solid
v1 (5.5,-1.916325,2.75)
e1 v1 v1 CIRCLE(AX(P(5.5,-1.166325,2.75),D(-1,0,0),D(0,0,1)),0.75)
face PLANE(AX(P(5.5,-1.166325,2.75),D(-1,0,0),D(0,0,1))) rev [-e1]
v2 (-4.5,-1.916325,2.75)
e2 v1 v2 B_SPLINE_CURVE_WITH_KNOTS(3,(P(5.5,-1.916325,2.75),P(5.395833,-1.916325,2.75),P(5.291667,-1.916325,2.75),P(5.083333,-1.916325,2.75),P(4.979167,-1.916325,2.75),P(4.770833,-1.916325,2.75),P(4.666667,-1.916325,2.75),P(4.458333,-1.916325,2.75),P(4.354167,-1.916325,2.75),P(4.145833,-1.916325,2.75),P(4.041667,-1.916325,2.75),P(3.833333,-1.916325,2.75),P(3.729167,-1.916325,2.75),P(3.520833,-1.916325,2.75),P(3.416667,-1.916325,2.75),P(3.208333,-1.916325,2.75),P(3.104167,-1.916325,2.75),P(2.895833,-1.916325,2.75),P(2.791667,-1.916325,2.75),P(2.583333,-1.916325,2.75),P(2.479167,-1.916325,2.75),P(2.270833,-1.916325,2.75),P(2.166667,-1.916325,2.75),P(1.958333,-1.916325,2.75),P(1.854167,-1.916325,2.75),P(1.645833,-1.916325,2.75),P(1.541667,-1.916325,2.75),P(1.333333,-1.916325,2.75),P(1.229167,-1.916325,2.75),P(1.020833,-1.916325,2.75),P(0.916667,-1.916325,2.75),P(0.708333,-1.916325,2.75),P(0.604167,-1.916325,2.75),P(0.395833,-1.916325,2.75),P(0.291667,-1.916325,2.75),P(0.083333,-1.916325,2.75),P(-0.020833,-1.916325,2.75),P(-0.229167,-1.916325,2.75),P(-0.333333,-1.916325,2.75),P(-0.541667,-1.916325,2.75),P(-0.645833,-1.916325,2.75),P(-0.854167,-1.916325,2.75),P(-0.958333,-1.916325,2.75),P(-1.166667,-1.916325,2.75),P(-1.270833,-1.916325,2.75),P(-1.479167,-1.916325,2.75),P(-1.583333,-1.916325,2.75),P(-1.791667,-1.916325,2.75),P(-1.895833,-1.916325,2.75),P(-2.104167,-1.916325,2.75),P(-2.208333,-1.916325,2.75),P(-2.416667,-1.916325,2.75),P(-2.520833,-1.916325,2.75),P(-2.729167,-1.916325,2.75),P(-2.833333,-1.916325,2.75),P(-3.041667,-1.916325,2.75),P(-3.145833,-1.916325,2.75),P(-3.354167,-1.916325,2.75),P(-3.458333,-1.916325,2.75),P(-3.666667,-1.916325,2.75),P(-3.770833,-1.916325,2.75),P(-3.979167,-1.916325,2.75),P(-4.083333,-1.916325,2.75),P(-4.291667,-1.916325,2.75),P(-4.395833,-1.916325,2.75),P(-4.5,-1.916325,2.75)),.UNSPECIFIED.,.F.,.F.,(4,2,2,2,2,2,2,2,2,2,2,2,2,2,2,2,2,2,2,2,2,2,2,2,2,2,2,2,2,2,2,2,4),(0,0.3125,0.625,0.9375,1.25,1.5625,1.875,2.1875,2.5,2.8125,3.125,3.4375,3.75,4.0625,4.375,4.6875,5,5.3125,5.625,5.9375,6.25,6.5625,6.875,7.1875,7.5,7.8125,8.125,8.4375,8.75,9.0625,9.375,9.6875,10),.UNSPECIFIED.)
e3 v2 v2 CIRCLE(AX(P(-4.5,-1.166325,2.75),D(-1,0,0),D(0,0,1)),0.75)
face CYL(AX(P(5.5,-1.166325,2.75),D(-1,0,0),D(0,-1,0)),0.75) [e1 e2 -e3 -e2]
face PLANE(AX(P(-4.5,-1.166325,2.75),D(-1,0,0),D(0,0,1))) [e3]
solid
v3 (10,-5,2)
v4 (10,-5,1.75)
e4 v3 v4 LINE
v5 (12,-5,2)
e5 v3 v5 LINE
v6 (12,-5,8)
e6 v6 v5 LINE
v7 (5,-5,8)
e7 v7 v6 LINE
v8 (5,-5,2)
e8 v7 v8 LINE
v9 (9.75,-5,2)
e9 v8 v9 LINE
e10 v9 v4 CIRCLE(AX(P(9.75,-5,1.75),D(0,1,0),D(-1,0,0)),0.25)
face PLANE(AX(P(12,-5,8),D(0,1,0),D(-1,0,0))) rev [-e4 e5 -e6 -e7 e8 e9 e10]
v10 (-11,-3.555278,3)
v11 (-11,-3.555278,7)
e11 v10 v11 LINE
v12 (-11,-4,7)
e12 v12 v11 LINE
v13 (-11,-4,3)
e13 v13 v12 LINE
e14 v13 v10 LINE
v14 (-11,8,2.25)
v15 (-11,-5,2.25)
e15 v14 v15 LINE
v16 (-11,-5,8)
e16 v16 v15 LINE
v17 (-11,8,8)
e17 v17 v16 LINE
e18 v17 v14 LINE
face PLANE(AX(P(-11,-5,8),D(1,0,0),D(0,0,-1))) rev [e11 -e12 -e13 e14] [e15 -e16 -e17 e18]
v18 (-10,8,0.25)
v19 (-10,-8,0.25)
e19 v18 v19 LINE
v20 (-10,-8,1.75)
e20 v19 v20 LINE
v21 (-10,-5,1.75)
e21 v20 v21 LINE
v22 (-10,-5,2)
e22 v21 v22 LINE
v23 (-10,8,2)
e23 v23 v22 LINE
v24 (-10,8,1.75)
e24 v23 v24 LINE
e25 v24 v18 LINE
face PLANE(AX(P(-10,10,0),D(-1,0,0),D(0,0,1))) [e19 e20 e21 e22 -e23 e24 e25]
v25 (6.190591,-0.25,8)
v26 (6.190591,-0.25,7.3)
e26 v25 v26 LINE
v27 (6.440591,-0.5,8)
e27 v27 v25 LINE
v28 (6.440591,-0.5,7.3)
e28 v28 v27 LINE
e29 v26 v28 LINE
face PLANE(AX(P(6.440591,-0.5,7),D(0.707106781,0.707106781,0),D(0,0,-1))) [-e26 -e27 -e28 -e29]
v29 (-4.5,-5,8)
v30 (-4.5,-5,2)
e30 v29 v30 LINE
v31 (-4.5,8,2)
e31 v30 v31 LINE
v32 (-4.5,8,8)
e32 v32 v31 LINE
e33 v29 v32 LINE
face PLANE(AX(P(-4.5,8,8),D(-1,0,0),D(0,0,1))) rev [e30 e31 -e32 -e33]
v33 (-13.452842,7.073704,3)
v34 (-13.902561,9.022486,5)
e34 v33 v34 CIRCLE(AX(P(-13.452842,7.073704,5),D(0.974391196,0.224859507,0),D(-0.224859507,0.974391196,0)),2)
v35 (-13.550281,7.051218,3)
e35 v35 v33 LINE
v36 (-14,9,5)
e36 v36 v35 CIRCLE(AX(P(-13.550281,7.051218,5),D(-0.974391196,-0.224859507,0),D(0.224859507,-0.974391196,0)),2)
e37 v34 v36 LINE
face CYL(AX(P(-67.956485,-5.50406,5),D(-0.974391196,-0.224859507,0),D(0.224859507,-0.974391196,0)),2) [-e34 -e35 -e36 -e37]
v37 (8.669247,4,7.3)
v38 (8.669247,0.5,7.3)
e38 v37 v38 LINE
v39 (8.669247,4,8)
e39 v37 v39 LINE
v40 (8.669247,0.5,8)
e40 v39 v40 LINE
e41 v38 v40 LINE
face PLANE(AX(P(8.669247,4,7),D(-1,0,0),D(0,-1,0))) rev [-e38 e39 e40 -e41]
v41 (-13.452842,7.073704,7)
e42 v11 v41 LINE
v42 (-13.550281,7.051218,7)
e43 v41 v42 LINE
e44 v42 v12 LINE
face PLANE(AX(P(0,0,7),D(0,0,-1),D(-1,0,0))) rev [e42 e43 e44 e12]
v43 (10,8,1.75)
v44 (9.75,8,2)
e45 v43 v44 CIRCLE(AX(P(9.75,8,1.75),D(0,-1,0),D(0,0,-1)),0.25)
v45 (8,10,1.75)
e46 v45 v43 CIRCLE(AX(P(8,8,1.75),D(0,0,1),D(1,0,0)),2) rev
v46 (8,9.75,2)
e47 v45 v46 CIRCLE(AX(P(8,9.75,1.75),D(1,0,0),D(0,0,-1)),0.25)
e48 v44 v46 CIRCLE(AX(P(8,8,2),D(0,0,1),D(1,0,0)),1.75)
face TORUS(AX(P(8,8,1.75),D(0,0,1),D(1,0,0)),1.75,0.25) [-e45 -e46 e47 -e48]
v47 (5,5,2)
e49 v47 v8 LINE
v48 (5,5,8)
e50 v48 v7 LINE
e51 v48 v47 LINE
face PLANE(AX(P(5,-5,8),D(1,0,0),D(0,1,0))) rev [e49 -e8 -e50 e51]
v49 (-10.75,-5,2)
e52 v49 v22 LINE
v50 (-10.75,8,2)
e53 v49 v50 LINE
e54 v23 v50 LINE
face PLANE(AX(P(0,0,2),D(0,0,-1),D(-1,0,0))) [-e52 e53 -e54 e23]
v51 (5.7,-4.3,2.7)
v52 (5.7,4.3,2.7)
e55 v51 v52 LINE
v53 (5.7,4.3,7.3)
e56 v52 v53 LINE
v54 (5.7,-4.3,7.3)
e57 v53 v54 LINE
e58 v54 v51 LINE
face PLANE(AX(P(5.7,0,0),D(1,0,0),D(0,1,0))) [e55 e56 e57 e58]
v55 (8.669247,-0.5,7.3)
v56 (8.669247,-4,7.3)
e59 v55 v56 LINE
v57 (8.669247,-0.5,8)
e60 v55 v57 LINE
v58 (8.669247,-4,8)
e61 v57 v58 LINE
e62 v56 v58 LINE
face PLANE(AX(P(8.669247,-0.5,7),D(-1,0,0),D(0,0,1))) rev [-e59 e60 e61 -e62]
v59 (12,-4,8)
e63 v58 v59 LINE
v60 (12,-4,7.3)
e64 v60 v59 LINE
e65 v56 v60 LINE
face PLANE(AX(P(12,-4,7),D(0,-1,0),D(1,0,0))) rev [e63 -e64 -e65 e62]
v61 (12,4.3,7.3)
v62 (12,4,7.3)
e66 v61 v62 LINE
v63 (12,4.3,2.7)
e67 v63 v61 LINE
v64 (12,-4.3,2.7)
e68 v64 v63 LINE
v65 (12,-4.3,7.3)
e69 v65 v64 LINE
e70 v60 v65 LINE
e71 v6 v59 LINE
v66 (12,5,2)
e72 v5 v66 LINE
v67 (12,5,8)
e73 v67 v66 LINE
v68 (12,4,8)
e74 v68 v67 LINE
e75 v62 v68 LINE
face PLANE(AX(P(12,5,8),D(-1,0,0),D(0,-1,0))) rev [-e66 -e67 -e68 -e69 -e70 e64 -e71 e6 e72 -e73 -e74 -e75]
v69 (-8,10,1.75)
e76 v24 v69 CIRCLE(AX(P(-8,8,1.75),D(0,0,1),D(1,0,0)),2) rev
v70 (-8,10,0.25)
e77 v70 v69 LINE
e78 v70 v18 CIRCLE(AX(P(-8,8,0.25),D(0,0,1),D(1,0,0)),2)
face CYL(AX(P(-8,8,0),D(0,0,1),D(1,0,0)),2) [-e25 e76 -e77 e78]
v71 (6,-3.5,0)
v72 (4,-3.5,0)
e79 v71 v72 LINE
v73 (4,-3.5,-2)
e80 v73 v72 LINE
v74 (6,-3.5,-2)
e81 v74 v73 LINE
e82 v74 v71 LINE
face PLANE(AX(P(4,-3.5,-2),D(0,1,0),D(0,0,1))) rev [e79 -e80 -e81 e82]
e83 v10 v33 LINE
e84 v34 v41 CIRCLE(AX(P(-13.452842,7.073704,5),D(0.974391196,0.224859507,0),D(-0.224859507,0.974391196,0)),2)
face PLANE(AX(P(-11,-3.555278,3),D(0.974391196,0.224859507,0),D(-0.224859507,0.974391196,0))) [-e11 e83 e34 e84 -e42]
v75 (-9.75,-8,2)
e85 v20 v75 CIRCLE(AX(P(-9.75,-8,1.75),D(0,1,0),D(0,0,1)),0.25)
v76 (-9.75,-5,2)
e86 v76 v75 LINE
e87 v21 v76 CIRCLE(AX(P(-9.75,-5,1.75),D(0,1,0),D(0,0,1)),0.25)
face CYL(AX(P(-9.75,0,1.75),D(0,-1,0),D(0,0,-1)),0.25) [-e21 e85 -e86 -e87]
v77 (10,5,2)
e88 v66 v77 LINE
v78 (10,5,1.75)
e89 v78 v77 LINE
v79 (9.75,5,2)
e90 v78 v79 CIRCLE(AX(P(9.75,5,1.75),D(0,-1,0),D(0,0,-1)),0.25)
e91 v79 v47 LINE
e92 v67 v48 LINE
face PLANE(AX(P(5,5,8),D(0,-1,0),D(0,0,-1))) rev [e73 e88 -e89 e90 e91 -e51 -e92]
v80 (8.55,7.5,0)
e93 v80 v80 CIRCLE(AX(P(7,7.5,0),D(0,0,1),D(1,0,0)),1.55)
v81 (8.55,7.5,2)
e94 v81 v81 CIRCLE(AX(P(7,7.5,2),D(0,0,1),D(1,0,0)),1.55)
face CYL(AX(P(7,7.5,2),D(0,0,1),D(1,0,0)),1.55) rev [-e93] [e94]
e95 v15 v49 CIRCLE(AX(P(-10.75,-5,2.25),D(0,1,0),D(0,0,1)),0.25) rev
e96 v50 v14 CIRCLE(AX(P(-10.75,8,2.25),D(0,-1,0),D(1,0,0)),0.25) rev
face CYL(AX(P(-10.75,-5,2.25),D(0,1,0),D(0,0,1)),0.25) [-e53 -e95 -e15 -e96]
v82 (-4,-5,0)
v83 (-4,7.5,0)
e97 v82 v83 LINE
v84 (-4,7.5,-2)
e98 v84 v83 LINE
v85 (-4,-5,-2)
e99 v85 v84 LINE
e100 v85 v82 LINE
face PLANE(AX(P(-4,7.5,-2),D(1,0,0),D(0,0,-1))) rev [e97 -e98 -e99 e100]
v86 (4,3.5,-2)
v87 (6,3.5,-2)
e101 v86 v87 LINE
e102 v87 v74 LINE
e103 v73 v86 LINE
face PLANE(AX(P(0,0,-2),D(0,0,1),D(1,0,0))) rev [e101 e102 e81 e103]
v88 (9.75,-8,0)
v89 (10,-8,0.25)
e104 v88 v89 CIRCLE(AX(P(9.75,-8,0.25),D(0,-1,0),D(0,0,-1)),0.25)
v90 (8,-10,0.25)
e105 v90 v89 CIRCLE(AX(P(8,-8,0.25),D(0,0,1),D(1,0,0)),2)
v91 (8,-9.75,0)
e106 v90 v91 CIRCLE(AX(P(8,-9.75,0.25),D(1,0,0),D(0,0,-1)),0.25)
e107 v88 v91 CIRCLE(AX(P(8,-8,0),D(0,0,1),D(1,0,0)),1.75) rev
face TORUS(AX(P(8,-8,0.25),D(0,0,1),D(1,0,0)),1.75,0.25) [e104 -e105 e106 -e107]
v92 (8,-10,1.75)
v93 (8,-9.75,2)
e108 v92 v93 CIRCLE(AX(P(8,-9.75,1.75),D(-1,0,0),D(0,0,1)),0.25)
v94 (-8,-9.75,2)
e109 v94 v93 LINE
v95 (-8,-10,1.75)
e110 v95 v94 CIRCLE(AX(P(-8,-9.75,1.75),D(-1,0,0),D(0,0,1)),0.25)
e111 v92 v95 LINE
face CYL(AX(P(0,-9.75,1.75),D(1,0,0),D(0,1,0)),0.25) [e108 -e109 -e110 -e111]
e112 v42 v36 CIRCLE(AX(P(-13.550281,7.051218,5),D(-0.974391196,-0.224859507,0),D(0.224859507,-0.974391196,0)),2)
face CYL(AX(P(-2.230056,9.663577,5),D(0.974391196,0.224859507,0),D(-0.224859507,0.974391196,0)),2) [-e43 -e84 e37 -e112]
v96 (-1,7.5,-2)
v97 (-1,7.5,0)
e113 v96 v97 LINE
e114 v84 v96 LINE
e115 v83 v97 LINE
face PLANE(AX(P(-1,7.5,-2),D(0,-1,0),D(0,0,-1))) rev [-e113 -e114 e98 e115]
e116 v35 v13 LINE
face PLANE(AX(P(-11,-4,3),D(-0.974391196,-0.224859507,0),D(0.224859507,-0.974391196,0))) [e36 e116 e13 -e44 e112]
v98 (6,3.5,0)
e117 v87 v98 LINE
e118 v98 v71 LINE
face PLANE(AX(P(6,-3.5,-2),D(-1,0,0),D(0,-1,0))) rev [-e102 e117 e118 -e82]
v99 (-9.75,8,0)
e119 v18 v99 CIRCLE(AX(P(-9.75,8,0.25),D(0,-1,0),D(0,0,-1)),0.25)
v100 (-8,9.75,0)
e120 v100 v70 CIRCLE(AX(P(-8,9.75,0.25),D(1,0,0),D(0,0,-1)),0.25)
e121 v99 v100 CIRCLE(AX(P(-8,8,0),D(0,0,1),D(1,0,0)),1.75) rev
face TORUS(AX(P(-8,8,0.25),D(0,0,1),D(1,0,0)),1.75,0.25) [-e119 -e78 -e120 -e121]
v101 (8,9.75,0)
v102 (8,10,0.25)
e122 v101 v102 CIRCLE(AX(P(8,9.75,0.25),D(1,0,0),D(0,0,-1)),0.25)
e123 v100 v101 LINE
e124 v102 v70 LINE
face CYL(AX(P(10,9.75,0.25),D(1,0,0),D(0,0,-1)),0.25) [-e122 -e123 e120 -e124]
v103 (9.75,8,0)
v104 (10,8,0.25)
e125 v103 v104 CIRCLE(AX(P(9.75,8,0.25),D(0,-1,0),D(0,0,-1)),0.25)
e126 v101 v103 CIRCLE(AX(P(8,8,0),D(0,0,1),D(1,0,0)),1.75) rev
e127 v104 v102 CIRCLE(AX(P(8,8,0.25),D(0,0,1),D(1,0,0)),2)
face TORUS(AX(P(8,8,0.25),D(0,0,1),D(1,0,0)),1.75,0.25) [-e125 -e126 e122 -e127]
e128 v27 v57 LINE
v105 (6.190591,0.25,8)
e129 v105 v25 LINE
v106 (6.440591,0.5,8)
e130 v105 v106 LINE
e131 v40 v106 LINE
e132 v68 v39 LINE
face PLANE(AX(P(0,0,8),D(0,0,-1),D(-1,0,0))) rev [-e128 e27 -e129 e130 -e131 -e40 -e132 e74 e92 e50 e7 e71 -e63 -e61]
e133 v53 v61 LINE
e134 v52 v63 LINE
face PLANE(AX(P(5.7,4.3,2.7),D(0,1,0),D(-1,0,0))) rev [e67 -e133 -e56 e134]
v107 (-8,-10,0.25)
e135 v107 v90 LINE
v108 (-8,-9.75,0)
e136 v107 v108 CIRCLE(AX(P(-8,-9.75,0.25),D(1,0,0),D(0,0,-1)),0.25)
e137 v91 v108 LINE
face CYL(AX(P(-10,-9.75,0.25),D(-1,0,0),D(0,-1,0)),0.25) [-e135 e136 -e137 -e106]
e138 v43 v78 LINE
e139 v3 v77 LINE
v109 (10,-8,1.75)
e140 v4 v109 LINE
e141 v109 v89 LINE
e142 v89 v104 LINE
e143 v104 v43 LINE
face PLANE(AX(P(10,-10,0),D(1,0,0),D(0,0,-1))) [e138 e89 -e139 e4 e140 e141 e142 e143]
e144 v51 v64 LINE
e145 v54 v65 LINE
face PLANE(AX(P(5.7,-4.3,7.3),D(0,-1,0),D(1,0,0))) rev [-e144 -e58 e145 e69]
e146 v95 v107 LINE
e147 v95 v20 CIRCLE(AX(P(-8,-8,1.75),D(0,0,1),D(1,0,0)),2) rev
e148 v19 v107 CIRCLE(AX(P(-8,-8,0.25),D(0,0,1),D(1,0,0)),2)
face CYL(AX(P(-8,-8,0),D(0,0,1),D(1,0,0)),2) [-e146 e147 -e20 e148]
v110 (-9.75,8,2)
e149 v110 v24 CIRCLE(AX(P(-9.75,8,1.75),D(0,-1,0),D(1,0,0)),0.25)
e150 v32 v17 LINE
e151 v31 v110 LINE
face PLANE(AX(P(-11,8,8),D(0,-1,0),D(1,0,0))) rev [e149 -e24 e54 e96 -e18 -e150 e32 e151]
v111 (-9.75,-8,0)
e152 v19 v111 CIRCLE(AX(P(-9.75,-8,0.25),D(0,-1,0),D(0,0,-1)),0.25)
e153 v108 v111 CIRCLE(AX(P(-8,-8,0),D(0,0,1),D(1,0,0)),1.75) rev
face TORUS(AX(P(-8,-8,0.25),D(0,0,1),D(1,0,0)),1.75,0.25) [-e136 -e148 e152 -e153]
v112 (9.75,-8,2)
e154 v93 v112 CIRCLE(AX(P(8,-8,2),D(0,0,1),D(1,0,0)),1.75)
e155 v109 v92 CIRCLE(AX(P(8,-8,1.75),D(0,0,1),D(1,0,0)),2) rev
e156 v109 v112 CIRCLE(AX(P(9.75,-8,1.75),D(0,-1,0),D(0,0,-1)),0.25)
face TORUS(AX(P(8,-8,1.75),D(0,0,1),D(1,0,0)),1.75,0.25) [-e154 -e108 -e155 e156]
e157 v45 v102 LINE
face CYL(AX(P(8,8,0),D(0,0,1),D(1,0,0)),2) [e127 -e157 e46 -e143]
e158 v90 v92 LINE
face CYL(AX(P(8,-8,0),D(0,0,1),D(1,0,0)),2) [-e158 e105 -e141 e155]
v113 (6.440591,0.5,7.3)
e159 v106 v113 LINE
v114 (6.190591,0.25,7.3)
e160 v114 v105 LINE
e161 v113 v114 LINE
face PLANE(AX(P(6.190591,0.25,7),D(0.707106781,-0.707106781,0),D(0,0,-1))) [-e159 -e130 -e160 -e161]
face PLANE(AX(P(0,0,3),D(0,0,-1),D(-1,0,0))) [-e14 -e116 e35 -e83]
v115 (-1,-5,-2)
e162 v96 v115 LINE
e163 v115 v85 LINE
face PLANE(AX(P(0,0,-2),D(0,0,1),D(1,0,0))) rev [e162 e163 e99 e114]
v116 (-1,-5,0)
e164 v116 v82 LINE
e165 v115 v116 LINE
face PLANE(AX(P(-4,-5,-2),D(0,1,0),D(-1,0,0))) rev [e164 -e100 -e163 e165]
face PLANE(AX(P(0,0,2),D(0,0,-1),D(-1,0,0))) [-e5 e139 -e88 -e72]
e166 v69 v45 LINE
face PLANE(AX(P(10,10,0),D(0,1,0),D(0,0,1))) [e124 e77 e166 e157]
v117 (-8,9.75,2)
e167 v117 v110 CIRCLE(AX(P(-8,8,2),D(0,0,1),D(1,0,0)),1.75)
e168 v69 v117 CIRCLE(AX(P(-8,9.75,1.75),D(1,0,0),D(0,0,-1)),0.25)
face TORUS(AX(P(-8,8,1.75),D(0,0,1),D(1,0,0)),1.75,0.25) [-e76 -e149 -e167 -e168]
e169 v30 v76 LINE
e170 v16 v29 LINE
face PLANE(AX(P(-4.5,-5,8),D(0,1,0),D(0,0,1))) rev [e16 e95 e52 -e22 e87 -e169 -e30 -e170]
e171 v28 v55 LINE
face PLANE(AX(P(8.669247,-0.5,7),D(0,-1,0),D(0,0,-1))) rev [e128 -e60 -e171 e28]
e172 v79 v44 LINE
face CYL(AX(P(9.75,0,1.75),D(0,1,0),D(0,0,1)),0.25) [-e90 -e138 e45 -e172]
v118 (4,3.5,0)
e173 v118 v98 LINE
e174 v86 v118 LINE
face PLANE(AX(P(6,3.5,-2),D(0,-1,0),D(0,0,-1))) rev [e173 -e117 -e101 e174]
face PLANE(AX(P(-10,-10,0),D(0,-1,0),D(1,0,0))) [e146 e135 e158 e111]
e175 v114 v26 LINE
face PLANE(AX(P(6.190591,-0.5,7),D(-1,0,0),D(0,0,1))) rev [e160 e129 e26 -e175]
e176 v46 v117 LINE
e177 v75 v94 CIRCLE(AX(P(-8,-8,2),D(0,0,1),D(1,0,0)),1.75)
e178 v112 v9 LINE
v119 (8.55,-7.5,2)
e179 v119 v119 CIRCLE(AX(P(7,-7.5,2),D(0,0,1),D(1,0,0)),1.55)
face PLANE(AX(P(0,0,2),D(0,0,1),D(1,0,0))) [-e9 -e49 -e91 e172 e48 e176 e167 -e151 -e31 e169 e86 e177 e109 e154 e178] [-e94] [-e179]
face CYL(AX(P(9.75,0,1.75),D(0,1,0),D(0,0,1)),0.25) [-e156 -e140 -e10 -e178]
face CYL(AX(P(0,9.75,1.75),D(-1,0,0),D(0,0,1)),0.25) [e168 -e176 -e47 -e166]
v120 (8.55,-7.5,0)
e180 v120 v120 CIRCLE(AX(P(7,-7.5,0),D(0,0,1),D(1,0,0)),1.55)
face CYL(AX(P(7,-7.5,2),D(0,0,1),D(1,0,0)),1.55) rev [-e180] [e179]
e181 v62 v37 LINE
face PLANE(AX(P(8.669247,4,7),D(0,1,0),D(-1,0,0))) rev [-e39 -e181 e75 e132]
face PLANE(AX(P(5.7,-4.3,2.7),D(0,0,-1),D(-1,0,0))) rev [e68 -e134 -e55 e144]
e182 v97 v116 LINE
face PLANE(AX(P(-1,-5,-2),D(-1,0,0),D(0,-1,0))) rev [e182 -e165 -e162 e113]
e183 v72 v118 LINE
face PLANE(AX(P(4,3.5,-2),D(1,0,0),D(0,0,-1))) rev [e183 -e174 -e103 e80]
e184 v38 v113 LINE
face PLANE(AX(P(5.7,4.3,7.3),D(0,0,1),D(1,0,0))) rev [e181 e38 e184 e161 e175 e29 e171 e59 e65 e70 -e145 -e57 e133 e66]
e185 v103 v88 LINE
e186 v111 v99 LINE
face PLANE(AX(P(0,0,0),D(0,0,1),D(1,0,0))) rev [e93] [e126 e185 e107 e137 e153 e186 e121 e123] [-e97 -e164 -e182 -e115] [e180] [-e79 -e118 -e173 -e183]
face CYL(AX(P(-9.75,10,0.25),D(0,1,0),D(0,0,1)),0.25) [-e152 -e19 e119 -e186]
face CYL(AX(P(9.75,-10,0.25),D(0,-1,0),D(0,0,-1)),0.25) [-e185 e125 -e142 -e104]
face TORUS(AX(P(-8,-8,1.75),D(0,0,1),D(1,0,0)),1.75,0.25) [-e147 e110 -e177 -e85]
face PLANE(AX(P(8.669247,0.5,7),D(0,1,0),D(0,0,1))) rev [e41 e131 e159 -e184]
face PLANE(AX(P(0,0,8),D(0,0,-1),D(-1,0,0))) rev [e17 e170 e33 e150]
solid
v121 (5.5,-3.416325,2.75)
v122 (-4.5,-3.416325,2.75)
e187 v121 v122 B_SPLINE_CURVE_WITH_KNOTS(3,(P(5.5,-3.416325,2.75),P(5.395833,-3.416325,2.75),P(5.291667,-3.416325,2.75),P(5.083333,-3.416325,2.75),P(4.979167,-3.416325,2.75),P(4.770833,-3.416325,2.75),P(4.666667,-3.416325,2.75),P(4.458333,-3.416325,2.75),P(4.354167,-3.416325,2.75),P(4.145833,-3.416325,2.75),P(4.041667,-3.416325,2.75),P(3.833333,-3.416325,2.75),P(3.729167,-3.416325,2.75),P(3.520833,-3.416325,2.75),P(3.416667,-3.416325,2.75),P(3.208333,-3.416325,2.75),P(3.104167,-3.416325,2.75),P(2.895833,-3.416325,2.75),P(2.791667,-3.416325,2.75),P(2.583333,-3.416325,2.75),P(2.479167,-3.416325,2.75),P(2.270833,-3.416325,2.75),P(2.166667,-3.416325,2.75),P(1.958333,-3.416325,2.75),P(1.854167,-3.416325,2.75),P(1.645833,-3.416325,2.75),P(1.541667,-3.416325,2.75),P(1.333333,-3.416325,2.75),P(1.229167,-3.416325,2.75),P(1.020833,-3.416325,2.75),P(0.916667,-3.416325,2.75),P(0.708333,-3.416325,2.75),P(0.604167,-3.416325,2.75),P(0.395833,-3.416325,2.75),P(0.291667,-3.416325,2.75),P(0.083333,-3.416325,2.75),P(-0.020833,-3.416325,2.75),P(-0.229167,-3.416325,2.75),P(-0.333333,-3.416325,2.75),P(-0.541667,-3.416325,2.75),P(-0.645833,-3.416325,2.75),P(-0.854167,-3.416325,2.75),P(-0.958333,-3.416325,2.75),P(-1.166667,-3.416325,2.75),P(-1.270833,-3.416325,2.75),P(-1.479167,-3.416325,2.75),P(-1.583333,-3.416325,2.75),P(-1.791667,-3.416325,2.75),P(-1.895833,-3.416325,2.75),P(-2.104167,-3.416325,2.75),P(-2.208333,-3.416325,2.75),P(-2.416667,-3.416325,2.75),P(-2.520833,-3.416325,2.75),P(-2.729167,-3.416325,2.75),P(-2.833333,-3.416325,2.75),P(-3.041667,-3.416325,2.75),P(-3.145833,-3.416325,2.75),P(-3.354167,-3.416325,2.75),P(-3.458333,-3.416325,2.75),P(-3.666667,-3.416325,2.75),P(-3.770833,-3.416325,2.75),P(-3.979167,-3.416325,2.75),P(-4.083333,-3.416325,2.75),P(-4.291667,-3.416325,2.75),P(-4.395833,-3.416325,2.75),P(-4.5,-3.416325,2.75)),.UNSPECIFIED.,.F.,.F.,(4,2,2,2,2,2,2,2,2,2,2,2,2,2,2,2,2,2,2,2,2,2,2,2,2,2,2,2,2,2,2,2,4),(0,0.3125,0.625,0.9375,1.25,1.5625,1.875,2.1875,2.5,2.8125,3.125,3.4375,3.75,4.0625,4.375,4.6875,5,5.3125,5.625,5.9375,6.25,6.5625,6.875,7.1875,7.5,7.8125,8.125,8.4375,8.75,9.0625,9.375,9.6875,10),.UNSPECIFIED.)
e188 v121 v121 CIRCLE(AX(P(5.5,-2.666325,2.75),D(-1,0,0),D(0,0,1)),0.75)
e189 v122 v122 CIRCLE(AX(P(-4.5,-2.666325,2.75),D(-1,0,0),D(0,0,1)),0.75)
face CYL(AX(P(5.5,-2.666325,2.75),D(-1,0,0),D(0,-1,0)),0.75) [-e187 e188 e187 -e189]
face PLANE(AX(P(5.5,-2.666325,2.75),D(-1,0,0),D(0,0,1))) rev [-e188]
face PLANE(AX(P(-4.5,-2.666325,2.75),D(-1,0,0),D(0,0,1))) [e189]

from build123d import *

# Parameters (mm, degrees)
CROQUIS1_W                          = 20
CROQUIS1_H                          = 20
SALIENTE_EXTRUIR1_DEPTH             = 2
CROQUIS2_W                          = 7
CROQUIS2_H                          = 10
SALIENTE_EXTRUIR2_DEPTH             = 6
CROQUIS3_W                          = 6.5
CROQUIS3_H                          = 13
SALIENTE_EXTRUIR3_DEPTH             = 6
SALIENTE_EXTRUIR4_DEPTH             = 4
CROQUIS6_W                          = 3
CROQUIS6_H                          = 12.5
SALIENTE_EXTRUIR6_DEPTH             = 2
CROQUIS7_W                          = 2
CROQUIS7_H                          = 7
SALIENTE_EXTRUIR7_DEPTH             = 2
CROQUIS8_W                          = 4.6
CROQUIS8_H                          = 8.6
CORTAR_EXTRUIR1_DEPTH               = 6.3
NGULO_DE_SALIDA1_ANGLE              = -77.005383208
NGULO_DE_SALIDA2_ANGLE              = 77.005383208
DI_METRO_DE_TALADRO_3_1_3_1_1_D     = 3.1
DI_METRO_DE_TALADRO_3_1_3_1_1_DEPTH = 4
REDONDEO2_R                         = 2
REDONDEO3_R                         = 2
REDONDEO4_R                         = 0.25
CORTAR_EXTRUIR2_DEPTH               = 1
CHAFL_N1_SIZE                       = 0.25
CROQUIS19_R                         = 0.75
SALIENTE_EXTRUIR9_DEPTH             = 10
SALIENTE_EXTRUIR9_2_DEPTH           = 10


# Some blends are built 0.0001 mm under size
with BuildPart() as part:
    # Croquis1 → Saliente-Extruir1 (new body)
    with BuildSketch(Plane.XY.offset(2)):
        Rectangle(CROQUIS1_W, CROQUIS1_H)
    extrude(amount=-SALIENTE_EXTRUIR1_DEPTH)

    # Croquis2 → Saliente-Extruir2 (add)
    with BuildSketch(Plane.XY.offset(2)):
        with Locations((8.5, 0)):
            Rectangle(CROQUIS2_W, CROQUIS2_H)
    extrude(amount=SALIENTE_EXTRUIR2_DEPTH)

    # Croquis3 → Saliente-Extruir3 (add)
    with BuildSketch(Plane.XY.offset(2)):
        with Locations((-7.75, 1.5)):
            Rectangle(CROQUIS3_W, CROQUIS3_H)
    extrude(amount=SALIENTE_EXTRUIR3_DEPTH)

    # Croquis4 → Saliente-Extruir4 (add)
    with BuildSketch(Plane.XY.offset(7)):
        Polygon((-68.40620408, -3.555277865), (-70.333333333, -4), (-11, -4), (-11, -3.555277865), align=None)
    extrude(amount=-SALIENTE_EXTRUIR4_DEPTH)

    # Croquis6 → Saliente-Extruir6 (add)
    with BuildSketch(Plane(origin=(0, 0, 0), x_dir=(-1, 0, 0), z_dir=(0, 0, -1))):
        with Locations((2.5, 1.25)):
            Rectangle(CROQUIS6_W, CROQUIS6_H)
    extrude(amount=SALIENTE_EXTRUIR6_DEPTH)

    # Croquis7 → Saliente-Extruir7 (add)
    with BuildSketch(Plane(origin=(0, 0, 0), x_dir=(-1, 0, 0), z_dir=(0, 0, -1))):
        with Locations((-5, 0)):
            Rectangle(CROQUIS7_W, CROQUIS7_H)
    extrude(amount=SALIENTE_EXTRUIR7_DEPTH)

    # Croquis8 → Cortar-Extruir1 (cut)
    with BuildSketch(Plane(origin=(12, 0, 0), x_dir=(0, 0, -1), z_dir=(1, 0, 0))):
        with Locations((-5, 0)):
            Rectangle(CROQUIS8_W, CROQUIS8_H)
    extrude(amount=-CORTAR_EXTRUIR1_DEPTH, mode=Mode.SUBTRACT)

    # Ángulo de salida1
    ngulo_de_salida1_faces = [part.faces().sort_by_distance(p)[0] for p in [
        (-39.70310204, -3.555277865, 5),
    ]]
    draft(ngulo_de_salida1_faces, Plane(origin=(-11, -5, 8), x_dir=(0, 0, -1), z_dir=(-1, 0, 0)), NGULO_DE_SALIDA1_ANGLE)

    # Ángulo de salida2
    ngulo_de_salida2_faces = [part.faces().sort_by_distance(p)[0] for p in [
        (-40.666666667, -4, 5),
    ]]
    draft(ngulo_de_salida2_faces, Plane(origin=(-11, -5, 8), x_dir=(0, 0, -1), z_dir=(-1, 0, 0)), NGULO_DE_SALIDA2_ANGLE)

    # Diámetro de taladro Ø3.1 (3.1)1
    with Locations(Plane.XY.offset(2)):
        with Locations((7, -7.5), (7, 7.5)):
            Hole(DI_METRO_DE_TALADRO_3_1_3_1_1_D / 2, depth=DI_METRO_DE_TALADRO_3_1_3_1_1_DEPTH)

    # Redondeo2
    redondeo2_edges = [part.edges().sort_by_distance(p)[0] for p in [
        (10, 10, 1),
        (10, -10, 1),
        (-10, -10, 1),
        (-10, 10, 1),
    ]]
    fillet(redondeo2_edges, radius=REDONDEO2_R)

    # Redondeo3
    redondeo3_edges = [part.edges().sort_by_distance(p)[0] for p in [
        (-13.95128044, 9.011242975, 7),
        (-13.95128044, 9.011242975, 3),
    ]]
    fillet(redondeo3_edges, radius=REDONDEO3_R - 0.0001)  # a hair under: the kernel refuses the full size

    # Redondeo4
    # the kernel refuses this fillet: 0.25 mm, written as the material it takes off along each edge
    with BuildSketch(Plane(origin=(8, 10, 2), x_dir=(0, -1, 0), z_dir=(-1, 0, 0)), Plane(origin=(8, 10, 0), x_dir=(0, 0, 1), z_dir=(-1, 0, 0)), Plane(origin=(-8, -10, 2), x_dir=(0, 1, 0), z_dir=(1, 0, 0)), Plane(origin=(-10, 8, 0), x_dir=(0, 0, 1), z_dir=(0, -1, 0)), Plane(origin=(10, -8, 0), x_dir=(0, 0, 1), z_dir=(0, 1, 0)), Plane(origin=(-8, -10, 0), x_dir=(0, 0, 1), z_dir=(1, 0, 0))) as redondeo4_piece_1:
        with BuildLine():
            CenterArc((REDONDEO4_R, -REDONDEO4_R), REDONDEO4_R, 90, 90)
            Line((0, -REDONDEO4_R), (0, 0))
            Line((0, 0), (REDONDEO4_R, 0))
        make_face()
    extrude(amount=16, mode=Mode.SUBTRACT)
    with BuildSketch(Plane(origin=(10, -8, 2), x_dir=(-1, 0, 0), z_dir=(0, 1, 0)), Plane(origin=(10, 5, 2), x_dir=(-1, 0, 0), z_dir=(0, 1, 0)), Plane(origin=(-10, -5, 2), x_dir=(1, 0, 0), z_dir=(0, -1, 0))) as redondeo4_piece_2:
        with BuildLine():
            CenterArc((REDONDEO4_R, -REDONDEO4_R), REDONDEO4_R, 90, 90)
            Line((0, -REDONDEO4_R), (0, 0))
            Line((0, 0), (REDONDEO4_R, 0))
        make_face()
    extrude(amount=3, mode=Mode.SUBTRACT)
    with BuildSketch(Plane(origin=(-8, -8, 2), x_dir=(-1, 0, 0), z_dir=(0, 1, 0))) as redondeo4_piece_3:
        with BuildLine():
            CenterArc((2 - REDONDEO4_R, -REDONDEO4_R), REDONDEO4_R, 0, 90)
            Line((2, -REDONDEO4_R), (2, 0))
            Line((2, 0), (2 - REDONDEO4_R, 0))
        make_face()
    revolve(axis=Axis((-8, -8, 2), (0, 0, 1)), revolution_arc=90, mode=Mode.SUBTRACT)
    with BuildSketch(Plane(origin=(8, -8, 2), x_dir=(0, -1, 0), z_dir=(-1, 0, 0))) as redondeo4_piece_4:
        with BuildLine():
            CenterArc((2 - REDONDEO4_R, -REDONDEO4_R), REDONDEO4_R, 0, 90)
            Line((2, -REDONDEO4_R), (2, 0))
            Line((2, 0), (2 - REDONDEO4_R, 0))
        make_face()
    revolve(axis=Axis((8, -8, 2), (0, 0, 1)), revolution_arc=90, mode=Mode.SUBTRACT)
    with BuildSketch(Plane(origin=(8, 8, 2), x_dir=(0, 1, 0), z_dir=(-1, 0, 0))) as redondeo4_piece_5:
        with BuildLine():
            CenterArc((2 - REDONDEO4_R, REDONDEO4_R), REDONDEO4_R, 270, 90)
            Line((2, REDONDEO4_R), (2, 0))
            Line((2, 0), (2 - REDONDEO4_R, 0))
        make_face()
    revolve(axis=Axis((8, 8, 2), (0, 0, -1)), revolution_arc=90, mode=Mode.SUBTRACT)
    with BuildSketch(Plane(origin=(-8, 8, 2), x_dir=(-1, 0, 0), z_dir=(0, -1, 0))) as redondeo4_piece_6:
        with BuildLine():
            CenterArc((2 - REDONDEO4_R, REDONDEO4_R), REDONDEO4_R, 270, 90)
            Line((2, REDONDEO4_R), (2, 0))
            Line((2, 0), (2 - REDONDEO4_R, 0))
        make_face()
    revolve(axis=Axis((-8, 8, 2), (0, 0, -1)), revolution_arc=90, mode=Mode.SUBTRACT)
    with BuildSketch(Plane(origin=(-8, -8, 0), x_dir=(-1, 0, 0), z_dir=(0, 1, 0))) as redondeo4_piece_7:
        with BuildLine():
            CenterArc((2 - REDONDEO4_R, REDONDEO4_R), REDONDEO4_R, 270, 90)
            Line((2 - REDONDEO4_R, 0), (2, 0))
            Line((2, 0), (2, REDONDEO4_R))
        make_face()
    revolve(axis=Axis((-8, -8, 0), (0, 0, 1)), revolution_arc=90, mode=Mode.SUBTRACT)
    with BuildSketch(Plane(origin=(8, -8, 0), x_dir=(0, -1, 0), z_dir=(-1, 0, 0))) as redondeo4_piece_8:
        with BuildLine():
            CenterArc((2 - REDONDEO4_R, REDONDEO4_R), REDONDEO4_R, 270, 90)
            Line((2 - REDONDEO4_R, 0), (2, 0))
            Line((2, 0), (2, REDONDEO4_R))
        make_face()
    revolve(axis=Axis((8, -8, 0), (0, 0, 1)), revolution_arc=90, mode=Mode.SUBTRACT)
    with BuildSketch(Plane(origin=(8, 8, 0), x_dir=(0, 1, 0), z_dir=(-1, 0, 0))) as redondeo4_piece_9:
        with BuildLine():
            CenterArc((2 - REDONDEO4_R, -REDONDEO4_R), REDONDEO4_R, 0, 90)
            Line((2 - REDONDEO4_R, 0), (2, 0))
            Line((2, 0), (2, -REDONDEO4_R))
        make_face()
    revolve(axis=Axis((8, 8, 0), (0, 0, -1)), revolution_arc=90, mode=Mode.SUBTRACT)
    with BuildSketch(Plane(origin=(-8, 8, 0), x_dir=(-1, 0, 0), z_dir=(0, -1, 0))) as redondeo4_piece_10:
        with BuildLine():
            CenterArc((2 - REDONDEO4_R, -REDONDEO4_R), REDONDEO4_R, 0, 90)
            Line((2 - REDONDEO4_R, 0), (2, 0))
            Line((2, 0), (2, -REDONDEO4_R))
        make_face()
    revolve(axis=Axis((-8, 8, 0), (0, 0, -1)), revolution_arc=90, mode=Mode.SUBTRACT)
    with BuildSketch(Plane(origin=(-11, -5.625, 2), x_dir=(0, 0, 1), z_dir=(0, 1, 0))) as redondeo4_piece_11:
        with BuildLine():
            CenterArc((REDONDEO4_R, REDONDEO4_R), REDONDEO4_R, 180, 90)
            Line((0, REDONDEO4_R), (0, 0))
            Line((0, 0), (REDONDEO4_R, 0))
        make_face()
    extrude(amount=14.25, mode=Mode.SUBTRACT)

    # Croquis16 → Cortar-Extruir2 (cut)
    with BuildSketch(Plane.XY.offset(8)):
        Polygon((12, -4), (8.669246852, -4), (8.669246852, -0.5), (6.190591253, -0.5), (6.190591253, 0.5), (8.669246852, 0.5), (8.669246852, 4), (12, 4), align=None)
    extrude(amount=-CORTAR_EXTRUIR2_DEPTH, mode=Mode.SUBTRACT)

    # Chaflán1
    chafl_n1_edges = [part.edges().sort_by_distance(p)[0] for p in [
        (6.190591253, -0.5, 7.65),
        (6.190591253, 0.5, 7.65),
    ]]
    chamfer(chafl_n1_edges, length=CHAFL_N1_SIZE)


with BuildPart() as body_2:
    # Croquis19 → Saliente-Extruir9 (new body)
    with BuildSketch(Plane(origin=(-4.5, 0, 0), x_dir=(0, 0, -1), z_dir=(1, 0, 0))):
        with Locations(Location((-2.75, -1.166325022, 0), (0, 0, 270))):
            Circle(CROQUIS19_R)
    extrude(amount=SALIENTE_EXTRUIR9_DEPTH)


with BuildPart() as body_3:
    # Croquis19 → Saliente-Extruir9 2 (new body)
    with BuildSketch(Plane(origin=(-4.5, 0, 0), x_dir=(0, 0, -1), z_dir=(1, 0, 0))):
        with Locations(Location((-2.75, -2.666325022, 0), (0, 0, 270))):
            Circle(CROQUIS19_R)
    extrude(amount=SALIENTE_EXTRUIR9_2_DEPTH)


solid = Compound([part.part, body_2.part, body_3.part])
